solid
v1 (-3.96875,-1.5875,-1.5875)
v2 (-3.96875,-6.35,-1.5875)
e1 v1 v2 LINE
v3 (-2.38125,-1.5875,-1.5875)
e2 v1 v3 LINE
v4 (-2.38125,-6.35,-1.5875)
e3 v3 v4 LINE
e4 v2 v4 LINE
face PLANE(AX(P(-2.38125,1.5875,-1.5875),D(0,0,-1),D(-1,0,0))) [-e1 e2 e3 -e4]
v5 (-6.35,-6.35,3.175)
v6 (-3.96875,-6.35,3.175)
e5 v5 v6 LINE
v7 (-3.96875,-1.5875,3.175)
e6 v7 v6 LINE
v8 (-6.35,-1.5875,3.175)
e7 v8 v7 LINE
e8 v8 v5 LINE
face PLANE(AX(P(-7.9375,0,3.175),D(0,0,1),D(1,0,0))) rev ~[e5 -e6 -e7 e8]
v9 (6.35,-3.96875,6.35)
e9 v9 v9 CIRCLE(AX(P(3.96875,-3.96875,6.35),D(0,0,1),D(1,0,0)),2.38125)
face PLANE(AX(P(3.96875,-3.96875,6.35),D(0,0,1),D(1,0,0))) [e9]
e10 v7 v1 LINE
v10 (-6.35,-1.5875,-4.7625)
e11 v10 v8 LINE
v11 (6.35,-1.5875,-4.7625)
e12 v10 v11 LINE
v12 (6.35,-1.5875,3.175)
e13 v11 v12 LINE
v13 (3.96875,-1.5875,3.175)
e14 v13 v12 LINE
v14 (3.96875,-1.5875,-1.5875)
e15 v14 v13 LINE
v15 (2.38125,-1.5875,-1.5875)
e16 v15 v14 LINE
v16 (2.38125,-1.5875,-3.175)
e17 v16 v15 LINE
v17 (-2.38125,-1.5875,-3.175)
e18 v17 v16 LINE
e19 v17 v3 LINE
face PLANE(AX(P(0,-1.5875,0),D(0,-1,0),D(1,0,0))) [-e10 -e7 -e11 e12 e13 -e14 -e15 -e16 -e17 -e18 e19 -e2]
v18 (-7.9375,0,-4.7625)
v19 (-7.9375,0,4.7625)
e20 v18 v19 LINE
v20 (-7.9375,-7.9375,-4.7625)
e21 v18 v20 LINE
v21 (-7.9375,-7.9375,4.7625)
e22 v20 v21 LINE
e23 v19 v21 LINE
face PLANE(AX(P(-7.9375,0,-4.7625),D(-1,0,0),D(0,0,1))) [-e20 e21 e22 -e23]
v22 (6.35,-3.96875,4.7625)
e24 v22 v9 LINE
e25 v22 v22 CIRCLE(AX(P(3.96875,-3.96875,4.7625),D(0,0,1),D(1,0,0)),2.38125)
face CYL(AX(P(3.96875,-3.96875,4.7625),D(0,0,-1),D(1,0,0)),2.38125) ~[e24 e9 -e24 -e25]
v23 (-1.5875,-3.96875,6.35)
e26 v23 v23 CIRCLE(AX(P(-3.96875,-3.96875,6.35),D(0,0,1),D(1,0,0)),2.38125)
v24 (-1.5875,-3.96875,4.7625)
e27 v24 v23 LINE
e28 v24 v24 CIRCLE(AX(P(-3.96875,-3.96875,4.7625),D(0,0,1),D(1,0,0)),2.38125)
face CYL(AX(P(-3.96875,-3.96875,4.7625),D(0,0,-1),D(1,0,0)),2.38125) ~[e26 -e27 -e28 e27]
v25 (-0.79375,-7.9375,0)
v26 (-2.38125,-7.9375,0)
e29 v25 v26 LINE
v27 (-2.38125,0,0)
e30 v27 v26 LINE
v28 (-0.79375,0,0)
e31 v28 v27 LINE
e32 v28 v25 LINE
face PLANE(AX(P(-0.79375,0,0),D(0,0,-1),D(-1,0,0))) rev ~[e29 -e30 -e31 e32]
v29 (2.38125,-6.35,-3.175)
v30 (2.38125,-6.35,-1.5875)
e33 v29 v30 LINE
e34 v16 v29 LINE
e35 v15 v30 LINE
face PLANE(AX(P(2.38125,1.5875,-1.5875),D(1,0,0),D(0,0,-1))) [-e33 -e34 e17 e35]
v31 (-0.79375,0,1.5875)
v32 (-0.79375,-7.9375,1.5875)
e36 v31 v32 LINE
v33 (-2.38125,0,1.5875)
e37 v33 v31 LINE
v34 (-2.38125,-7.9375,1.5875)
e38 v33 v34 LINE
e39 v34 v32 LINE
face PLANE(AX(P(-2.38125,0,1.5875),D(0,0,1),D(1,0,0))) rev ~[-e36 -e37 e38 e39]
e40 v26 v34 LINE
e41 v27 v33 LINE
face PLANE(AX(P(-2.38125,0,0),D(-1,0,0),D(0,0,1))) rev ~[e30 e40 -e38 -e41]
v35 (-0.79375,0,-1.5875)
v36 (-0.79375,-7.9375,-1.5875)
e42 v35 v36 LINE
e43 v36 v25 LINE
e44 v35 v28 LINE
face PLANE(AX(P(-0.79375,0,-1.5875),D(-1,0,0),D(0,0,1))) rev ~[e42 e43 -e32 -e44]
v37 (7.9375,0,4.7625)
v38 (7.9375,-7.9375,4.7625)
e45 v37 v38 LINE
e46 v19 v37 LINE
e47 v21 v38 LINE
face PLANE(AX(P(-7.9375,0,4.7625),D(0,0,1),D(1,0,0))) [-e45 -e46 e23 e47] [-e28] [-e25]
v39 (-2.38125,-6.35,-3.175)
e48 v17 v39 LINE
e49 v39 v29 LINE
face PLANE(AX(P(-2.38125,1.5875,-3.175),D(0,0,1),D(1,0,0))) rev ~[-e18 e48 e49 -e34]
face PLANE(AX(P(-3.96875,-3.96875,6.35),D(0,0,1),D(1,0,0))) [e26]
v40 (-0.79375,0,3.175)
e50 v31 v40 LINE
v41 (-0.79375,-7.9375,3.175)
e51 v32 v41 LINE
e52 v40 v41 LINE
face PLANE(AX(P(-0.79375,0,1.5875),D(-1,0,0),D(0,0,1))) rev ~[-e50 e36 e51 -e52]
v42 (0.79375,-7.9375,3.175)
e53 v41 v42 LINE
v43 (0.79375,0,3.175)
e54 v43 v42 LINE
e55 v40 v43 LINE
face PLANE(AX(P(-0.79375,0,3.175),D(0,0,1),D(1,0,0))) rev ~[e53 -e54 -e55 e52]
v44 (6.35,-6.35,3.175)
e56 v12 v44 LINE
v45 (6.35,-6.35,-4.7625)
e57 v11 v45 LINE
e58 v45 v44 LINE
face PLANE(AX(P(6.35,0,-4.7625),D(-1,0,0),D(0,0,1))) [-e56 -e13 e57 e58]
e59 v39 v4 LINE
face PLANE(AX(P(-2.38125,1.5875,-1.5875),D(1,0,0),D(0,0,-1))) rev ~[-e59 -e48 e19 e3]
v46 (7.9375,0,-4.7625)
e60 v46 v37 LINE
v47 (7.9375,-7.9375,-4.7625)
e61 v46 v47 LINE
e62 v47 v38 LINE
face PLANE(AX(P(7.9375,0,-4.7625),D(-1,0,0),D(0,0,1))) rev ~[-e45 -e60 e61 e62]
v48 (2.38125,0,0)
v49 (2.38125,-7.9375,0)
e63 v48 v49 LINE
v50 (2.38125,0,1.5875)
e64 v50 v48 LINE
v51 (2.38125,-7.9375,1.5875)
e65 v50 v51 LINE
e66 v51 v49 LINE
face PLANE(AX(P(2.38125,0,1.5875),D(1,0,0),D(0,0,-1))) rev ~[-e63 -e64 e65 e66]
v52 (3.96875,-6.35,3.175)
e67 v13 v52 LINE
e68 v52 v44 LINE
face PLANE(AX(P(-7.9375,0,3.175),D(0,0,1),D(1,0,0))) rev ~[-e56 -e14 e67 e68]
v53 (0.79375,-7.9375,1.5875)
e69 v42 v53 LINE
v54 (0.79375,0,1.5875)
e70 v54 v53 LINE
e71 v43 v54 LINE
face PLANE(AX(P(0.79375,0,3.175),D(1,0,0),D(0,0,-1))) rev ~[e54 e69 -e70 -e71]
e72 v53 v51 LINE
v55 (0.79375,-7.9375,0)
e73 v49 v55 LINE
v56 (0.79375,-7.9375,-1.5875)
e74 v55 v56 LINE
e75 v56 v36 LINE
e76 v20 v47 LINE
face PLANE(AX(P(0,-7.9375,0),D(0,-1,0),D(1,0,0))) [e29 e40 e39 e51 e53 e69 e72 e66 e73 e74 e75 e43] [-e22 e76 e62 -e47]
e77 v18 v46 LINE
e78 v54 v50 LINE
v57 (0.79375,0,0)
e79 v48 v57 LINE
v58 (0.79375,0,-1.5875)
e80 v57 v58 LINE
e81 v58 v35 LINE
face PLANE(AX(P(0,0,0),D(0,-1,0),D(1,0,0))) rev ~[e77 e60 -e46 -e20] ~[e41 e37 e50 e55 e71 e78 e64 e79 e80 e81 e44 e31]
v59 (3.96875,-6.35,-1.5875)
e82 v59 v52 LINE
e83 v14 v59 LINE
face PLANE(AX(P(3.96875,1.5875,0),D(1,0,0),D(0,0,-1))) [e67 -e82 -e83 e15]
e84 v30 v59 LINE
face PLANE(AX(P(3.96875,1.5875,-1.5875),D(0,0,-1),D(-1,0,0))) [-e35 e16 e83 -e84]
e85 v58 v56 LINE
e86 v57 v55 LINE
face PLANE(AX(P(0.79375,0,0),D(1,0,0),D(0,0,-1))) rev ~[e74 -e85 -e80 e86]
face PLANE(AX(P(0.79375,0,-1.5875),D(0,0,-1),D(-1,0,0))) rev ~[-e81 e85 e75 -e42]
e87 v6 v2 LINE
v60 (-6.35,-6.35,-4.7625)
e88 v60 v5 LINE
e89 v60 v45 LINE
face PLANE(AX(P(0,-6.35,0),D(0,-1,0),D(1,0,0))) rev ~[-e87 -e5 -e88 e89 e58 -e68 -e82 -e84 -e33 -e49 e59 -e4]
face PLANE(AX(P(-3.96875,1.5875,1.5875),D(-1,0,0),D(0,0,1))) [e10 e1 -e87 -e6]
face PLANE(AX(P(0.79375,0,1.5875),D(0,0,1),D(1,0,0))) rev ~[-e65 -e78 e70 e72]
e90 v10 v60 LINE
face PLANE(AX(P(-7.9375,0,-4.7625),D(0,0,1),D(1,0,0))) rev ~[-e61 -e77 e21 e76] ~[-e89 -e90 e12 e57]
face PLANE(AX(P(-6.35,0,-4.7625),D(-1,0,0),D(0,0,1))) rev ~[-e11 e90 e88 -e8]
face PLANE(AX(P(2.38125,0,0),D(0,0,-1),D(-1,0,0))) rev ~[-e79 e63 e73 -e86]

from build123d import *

# Parameters (mm, degrees)
F0_W        = 15.875
F0_H        = 9.525
F1_DEPTH    = 7.9375
F2_T        = 1.5875
F2_T3_DEPTH = 11.1125
F3_R        = 2.38125
F4_DEPTH    = 1.5875


# Not quite as in the source:
# - a shell that OpenCascade refuses in one call is made with other operations: the cavity is built on its own and cut out


with BuildPart() as f1:
    # F0 (on Front) → F1 (new body)
    with BuildSketch(Plane.XZ):
        Rectangle(F0_W, F0_H)
        Polygon((-0.79375, 1.5875), (-0.79375, 3.175), (0.79375, 3.175), (0.79375, 1.5875), (2.38125, 1.5875), (2.38125, 0), (0.79375, 0), (0.79375, -1.5875), (-0.79375, -1.5875), (-0.79375, 0), (-2.38125, 0), (-2.38125, 1.5875), align=None, mode=Mode.SUBTRACT)
    extrude(amount=F1_DEPTH)

    # F2: shell of thickness 1.5875, made by hand


with BuildPart() as f2_core1:
    # F2_t2: copy of F1
    add(f1.part)

    # the walls: a layer under each face that stays
    f2_faces = [f2_core1.faces().sort_by_distance(p)[0] for p in [
        (0, -3.96875, 4.7625),
        (-7.9375, -3.96875, 0),
        (7.9375, -3.96875, 0),
        (-0.79375, -3.96875, -0.79375),
        (-1.5875, -3.96875, 0),
        (-2.38125, -3.96875, 0.79375),
        (-1.5875, -3.96875, 1.5875),
        (-0.79375, -3.96875, 2.38125),
        (0, -3.96875, 3.175),
        (0.79375, -3.96875, 2.38125),
        (1.5875, -3.96875, 1.5875),
        (2.38125, -3.96875, 0.79375),
        (1.5875, -3.96875, 0),
        (0.79375, -3.96875, -0.79375),
        (0, -3.96875, -1.5875),
        (-5.2916666667, 0, -3.175),
        (-5.2916666667, -7.9375, -3.175),
    ]]
    thicken(f2_faces, amount=-F2_T, mode=Mode.SUBTRACT)

    # F2_s4 → F2_t3 (cut)
    with BuildSketch(Plane.XZ.offset(-1.5875)):
        Polygon((-0.777875, -1.571625), (-2.38125, -1.5875), (-2.38125, -3.175), (-0.79375, -3.175), align=None)
        Polygon((-2.365375, 0.015875), (-2.38125, -1.5875), (-3.96875, -1.5875), (-3.96875, 0), align=None)
        Polygon((-2.365375, 1.571625), (-3.96875, 1.5875), (-3.96875, 3.175), (-2.38125, 3.175), align=None)
        Polygon((-0.777875, 3.159125), (-2.38125, 3.175), (-2.38125, 4.7625), (-0.79375, 4.7625), align=None)
        Polygon((0.777875, 3.159125), (0.79375, 4.7625), (2.38125, 4.7625), (2.38125, 3.175), align=None)
        Polygon((2.365375, 1.571625), (2.38125, 3.175), (3.96875, 3.175), (3.96875, 1.5875), align=None)
        Polygon((2.365375, 0.015875), (3.96875, 0), (3.96875, -1.5875), (2.38125, -1.5875), align=None)
        Polygon((0.777875, -1.571625), (2.38125, -1.5875), (2.38125, -3.175), (0.79375, -3.175), align=None)
    extrude(amount=F2_T3_DEPTH, mode=Mode.SUBTRACT)


with BuildPart() as f1_1:
    add(f1.part)

    # what is left inside the walls is the cavity
    f2_cavity = [f2_core1.part.solids().sort_by_distance(p)[0] for p in [
        (0, -4.7625, -4.746625),
    ]]
    add(f2_cavity, mode=Mode.SUBTRACT)

    # F3 (on face) → F4 (join)
    with BuildSketch(Plane.XY.offset(4.7625)):
        with Locations((-3.96875, -3.96875)):
            Circle(F3_R)
        with Locations((3.96875, -3.96875)):
            Circle(F3_R)
    extrude(amount=F4_DEPTH)


solid = f1_1.part
